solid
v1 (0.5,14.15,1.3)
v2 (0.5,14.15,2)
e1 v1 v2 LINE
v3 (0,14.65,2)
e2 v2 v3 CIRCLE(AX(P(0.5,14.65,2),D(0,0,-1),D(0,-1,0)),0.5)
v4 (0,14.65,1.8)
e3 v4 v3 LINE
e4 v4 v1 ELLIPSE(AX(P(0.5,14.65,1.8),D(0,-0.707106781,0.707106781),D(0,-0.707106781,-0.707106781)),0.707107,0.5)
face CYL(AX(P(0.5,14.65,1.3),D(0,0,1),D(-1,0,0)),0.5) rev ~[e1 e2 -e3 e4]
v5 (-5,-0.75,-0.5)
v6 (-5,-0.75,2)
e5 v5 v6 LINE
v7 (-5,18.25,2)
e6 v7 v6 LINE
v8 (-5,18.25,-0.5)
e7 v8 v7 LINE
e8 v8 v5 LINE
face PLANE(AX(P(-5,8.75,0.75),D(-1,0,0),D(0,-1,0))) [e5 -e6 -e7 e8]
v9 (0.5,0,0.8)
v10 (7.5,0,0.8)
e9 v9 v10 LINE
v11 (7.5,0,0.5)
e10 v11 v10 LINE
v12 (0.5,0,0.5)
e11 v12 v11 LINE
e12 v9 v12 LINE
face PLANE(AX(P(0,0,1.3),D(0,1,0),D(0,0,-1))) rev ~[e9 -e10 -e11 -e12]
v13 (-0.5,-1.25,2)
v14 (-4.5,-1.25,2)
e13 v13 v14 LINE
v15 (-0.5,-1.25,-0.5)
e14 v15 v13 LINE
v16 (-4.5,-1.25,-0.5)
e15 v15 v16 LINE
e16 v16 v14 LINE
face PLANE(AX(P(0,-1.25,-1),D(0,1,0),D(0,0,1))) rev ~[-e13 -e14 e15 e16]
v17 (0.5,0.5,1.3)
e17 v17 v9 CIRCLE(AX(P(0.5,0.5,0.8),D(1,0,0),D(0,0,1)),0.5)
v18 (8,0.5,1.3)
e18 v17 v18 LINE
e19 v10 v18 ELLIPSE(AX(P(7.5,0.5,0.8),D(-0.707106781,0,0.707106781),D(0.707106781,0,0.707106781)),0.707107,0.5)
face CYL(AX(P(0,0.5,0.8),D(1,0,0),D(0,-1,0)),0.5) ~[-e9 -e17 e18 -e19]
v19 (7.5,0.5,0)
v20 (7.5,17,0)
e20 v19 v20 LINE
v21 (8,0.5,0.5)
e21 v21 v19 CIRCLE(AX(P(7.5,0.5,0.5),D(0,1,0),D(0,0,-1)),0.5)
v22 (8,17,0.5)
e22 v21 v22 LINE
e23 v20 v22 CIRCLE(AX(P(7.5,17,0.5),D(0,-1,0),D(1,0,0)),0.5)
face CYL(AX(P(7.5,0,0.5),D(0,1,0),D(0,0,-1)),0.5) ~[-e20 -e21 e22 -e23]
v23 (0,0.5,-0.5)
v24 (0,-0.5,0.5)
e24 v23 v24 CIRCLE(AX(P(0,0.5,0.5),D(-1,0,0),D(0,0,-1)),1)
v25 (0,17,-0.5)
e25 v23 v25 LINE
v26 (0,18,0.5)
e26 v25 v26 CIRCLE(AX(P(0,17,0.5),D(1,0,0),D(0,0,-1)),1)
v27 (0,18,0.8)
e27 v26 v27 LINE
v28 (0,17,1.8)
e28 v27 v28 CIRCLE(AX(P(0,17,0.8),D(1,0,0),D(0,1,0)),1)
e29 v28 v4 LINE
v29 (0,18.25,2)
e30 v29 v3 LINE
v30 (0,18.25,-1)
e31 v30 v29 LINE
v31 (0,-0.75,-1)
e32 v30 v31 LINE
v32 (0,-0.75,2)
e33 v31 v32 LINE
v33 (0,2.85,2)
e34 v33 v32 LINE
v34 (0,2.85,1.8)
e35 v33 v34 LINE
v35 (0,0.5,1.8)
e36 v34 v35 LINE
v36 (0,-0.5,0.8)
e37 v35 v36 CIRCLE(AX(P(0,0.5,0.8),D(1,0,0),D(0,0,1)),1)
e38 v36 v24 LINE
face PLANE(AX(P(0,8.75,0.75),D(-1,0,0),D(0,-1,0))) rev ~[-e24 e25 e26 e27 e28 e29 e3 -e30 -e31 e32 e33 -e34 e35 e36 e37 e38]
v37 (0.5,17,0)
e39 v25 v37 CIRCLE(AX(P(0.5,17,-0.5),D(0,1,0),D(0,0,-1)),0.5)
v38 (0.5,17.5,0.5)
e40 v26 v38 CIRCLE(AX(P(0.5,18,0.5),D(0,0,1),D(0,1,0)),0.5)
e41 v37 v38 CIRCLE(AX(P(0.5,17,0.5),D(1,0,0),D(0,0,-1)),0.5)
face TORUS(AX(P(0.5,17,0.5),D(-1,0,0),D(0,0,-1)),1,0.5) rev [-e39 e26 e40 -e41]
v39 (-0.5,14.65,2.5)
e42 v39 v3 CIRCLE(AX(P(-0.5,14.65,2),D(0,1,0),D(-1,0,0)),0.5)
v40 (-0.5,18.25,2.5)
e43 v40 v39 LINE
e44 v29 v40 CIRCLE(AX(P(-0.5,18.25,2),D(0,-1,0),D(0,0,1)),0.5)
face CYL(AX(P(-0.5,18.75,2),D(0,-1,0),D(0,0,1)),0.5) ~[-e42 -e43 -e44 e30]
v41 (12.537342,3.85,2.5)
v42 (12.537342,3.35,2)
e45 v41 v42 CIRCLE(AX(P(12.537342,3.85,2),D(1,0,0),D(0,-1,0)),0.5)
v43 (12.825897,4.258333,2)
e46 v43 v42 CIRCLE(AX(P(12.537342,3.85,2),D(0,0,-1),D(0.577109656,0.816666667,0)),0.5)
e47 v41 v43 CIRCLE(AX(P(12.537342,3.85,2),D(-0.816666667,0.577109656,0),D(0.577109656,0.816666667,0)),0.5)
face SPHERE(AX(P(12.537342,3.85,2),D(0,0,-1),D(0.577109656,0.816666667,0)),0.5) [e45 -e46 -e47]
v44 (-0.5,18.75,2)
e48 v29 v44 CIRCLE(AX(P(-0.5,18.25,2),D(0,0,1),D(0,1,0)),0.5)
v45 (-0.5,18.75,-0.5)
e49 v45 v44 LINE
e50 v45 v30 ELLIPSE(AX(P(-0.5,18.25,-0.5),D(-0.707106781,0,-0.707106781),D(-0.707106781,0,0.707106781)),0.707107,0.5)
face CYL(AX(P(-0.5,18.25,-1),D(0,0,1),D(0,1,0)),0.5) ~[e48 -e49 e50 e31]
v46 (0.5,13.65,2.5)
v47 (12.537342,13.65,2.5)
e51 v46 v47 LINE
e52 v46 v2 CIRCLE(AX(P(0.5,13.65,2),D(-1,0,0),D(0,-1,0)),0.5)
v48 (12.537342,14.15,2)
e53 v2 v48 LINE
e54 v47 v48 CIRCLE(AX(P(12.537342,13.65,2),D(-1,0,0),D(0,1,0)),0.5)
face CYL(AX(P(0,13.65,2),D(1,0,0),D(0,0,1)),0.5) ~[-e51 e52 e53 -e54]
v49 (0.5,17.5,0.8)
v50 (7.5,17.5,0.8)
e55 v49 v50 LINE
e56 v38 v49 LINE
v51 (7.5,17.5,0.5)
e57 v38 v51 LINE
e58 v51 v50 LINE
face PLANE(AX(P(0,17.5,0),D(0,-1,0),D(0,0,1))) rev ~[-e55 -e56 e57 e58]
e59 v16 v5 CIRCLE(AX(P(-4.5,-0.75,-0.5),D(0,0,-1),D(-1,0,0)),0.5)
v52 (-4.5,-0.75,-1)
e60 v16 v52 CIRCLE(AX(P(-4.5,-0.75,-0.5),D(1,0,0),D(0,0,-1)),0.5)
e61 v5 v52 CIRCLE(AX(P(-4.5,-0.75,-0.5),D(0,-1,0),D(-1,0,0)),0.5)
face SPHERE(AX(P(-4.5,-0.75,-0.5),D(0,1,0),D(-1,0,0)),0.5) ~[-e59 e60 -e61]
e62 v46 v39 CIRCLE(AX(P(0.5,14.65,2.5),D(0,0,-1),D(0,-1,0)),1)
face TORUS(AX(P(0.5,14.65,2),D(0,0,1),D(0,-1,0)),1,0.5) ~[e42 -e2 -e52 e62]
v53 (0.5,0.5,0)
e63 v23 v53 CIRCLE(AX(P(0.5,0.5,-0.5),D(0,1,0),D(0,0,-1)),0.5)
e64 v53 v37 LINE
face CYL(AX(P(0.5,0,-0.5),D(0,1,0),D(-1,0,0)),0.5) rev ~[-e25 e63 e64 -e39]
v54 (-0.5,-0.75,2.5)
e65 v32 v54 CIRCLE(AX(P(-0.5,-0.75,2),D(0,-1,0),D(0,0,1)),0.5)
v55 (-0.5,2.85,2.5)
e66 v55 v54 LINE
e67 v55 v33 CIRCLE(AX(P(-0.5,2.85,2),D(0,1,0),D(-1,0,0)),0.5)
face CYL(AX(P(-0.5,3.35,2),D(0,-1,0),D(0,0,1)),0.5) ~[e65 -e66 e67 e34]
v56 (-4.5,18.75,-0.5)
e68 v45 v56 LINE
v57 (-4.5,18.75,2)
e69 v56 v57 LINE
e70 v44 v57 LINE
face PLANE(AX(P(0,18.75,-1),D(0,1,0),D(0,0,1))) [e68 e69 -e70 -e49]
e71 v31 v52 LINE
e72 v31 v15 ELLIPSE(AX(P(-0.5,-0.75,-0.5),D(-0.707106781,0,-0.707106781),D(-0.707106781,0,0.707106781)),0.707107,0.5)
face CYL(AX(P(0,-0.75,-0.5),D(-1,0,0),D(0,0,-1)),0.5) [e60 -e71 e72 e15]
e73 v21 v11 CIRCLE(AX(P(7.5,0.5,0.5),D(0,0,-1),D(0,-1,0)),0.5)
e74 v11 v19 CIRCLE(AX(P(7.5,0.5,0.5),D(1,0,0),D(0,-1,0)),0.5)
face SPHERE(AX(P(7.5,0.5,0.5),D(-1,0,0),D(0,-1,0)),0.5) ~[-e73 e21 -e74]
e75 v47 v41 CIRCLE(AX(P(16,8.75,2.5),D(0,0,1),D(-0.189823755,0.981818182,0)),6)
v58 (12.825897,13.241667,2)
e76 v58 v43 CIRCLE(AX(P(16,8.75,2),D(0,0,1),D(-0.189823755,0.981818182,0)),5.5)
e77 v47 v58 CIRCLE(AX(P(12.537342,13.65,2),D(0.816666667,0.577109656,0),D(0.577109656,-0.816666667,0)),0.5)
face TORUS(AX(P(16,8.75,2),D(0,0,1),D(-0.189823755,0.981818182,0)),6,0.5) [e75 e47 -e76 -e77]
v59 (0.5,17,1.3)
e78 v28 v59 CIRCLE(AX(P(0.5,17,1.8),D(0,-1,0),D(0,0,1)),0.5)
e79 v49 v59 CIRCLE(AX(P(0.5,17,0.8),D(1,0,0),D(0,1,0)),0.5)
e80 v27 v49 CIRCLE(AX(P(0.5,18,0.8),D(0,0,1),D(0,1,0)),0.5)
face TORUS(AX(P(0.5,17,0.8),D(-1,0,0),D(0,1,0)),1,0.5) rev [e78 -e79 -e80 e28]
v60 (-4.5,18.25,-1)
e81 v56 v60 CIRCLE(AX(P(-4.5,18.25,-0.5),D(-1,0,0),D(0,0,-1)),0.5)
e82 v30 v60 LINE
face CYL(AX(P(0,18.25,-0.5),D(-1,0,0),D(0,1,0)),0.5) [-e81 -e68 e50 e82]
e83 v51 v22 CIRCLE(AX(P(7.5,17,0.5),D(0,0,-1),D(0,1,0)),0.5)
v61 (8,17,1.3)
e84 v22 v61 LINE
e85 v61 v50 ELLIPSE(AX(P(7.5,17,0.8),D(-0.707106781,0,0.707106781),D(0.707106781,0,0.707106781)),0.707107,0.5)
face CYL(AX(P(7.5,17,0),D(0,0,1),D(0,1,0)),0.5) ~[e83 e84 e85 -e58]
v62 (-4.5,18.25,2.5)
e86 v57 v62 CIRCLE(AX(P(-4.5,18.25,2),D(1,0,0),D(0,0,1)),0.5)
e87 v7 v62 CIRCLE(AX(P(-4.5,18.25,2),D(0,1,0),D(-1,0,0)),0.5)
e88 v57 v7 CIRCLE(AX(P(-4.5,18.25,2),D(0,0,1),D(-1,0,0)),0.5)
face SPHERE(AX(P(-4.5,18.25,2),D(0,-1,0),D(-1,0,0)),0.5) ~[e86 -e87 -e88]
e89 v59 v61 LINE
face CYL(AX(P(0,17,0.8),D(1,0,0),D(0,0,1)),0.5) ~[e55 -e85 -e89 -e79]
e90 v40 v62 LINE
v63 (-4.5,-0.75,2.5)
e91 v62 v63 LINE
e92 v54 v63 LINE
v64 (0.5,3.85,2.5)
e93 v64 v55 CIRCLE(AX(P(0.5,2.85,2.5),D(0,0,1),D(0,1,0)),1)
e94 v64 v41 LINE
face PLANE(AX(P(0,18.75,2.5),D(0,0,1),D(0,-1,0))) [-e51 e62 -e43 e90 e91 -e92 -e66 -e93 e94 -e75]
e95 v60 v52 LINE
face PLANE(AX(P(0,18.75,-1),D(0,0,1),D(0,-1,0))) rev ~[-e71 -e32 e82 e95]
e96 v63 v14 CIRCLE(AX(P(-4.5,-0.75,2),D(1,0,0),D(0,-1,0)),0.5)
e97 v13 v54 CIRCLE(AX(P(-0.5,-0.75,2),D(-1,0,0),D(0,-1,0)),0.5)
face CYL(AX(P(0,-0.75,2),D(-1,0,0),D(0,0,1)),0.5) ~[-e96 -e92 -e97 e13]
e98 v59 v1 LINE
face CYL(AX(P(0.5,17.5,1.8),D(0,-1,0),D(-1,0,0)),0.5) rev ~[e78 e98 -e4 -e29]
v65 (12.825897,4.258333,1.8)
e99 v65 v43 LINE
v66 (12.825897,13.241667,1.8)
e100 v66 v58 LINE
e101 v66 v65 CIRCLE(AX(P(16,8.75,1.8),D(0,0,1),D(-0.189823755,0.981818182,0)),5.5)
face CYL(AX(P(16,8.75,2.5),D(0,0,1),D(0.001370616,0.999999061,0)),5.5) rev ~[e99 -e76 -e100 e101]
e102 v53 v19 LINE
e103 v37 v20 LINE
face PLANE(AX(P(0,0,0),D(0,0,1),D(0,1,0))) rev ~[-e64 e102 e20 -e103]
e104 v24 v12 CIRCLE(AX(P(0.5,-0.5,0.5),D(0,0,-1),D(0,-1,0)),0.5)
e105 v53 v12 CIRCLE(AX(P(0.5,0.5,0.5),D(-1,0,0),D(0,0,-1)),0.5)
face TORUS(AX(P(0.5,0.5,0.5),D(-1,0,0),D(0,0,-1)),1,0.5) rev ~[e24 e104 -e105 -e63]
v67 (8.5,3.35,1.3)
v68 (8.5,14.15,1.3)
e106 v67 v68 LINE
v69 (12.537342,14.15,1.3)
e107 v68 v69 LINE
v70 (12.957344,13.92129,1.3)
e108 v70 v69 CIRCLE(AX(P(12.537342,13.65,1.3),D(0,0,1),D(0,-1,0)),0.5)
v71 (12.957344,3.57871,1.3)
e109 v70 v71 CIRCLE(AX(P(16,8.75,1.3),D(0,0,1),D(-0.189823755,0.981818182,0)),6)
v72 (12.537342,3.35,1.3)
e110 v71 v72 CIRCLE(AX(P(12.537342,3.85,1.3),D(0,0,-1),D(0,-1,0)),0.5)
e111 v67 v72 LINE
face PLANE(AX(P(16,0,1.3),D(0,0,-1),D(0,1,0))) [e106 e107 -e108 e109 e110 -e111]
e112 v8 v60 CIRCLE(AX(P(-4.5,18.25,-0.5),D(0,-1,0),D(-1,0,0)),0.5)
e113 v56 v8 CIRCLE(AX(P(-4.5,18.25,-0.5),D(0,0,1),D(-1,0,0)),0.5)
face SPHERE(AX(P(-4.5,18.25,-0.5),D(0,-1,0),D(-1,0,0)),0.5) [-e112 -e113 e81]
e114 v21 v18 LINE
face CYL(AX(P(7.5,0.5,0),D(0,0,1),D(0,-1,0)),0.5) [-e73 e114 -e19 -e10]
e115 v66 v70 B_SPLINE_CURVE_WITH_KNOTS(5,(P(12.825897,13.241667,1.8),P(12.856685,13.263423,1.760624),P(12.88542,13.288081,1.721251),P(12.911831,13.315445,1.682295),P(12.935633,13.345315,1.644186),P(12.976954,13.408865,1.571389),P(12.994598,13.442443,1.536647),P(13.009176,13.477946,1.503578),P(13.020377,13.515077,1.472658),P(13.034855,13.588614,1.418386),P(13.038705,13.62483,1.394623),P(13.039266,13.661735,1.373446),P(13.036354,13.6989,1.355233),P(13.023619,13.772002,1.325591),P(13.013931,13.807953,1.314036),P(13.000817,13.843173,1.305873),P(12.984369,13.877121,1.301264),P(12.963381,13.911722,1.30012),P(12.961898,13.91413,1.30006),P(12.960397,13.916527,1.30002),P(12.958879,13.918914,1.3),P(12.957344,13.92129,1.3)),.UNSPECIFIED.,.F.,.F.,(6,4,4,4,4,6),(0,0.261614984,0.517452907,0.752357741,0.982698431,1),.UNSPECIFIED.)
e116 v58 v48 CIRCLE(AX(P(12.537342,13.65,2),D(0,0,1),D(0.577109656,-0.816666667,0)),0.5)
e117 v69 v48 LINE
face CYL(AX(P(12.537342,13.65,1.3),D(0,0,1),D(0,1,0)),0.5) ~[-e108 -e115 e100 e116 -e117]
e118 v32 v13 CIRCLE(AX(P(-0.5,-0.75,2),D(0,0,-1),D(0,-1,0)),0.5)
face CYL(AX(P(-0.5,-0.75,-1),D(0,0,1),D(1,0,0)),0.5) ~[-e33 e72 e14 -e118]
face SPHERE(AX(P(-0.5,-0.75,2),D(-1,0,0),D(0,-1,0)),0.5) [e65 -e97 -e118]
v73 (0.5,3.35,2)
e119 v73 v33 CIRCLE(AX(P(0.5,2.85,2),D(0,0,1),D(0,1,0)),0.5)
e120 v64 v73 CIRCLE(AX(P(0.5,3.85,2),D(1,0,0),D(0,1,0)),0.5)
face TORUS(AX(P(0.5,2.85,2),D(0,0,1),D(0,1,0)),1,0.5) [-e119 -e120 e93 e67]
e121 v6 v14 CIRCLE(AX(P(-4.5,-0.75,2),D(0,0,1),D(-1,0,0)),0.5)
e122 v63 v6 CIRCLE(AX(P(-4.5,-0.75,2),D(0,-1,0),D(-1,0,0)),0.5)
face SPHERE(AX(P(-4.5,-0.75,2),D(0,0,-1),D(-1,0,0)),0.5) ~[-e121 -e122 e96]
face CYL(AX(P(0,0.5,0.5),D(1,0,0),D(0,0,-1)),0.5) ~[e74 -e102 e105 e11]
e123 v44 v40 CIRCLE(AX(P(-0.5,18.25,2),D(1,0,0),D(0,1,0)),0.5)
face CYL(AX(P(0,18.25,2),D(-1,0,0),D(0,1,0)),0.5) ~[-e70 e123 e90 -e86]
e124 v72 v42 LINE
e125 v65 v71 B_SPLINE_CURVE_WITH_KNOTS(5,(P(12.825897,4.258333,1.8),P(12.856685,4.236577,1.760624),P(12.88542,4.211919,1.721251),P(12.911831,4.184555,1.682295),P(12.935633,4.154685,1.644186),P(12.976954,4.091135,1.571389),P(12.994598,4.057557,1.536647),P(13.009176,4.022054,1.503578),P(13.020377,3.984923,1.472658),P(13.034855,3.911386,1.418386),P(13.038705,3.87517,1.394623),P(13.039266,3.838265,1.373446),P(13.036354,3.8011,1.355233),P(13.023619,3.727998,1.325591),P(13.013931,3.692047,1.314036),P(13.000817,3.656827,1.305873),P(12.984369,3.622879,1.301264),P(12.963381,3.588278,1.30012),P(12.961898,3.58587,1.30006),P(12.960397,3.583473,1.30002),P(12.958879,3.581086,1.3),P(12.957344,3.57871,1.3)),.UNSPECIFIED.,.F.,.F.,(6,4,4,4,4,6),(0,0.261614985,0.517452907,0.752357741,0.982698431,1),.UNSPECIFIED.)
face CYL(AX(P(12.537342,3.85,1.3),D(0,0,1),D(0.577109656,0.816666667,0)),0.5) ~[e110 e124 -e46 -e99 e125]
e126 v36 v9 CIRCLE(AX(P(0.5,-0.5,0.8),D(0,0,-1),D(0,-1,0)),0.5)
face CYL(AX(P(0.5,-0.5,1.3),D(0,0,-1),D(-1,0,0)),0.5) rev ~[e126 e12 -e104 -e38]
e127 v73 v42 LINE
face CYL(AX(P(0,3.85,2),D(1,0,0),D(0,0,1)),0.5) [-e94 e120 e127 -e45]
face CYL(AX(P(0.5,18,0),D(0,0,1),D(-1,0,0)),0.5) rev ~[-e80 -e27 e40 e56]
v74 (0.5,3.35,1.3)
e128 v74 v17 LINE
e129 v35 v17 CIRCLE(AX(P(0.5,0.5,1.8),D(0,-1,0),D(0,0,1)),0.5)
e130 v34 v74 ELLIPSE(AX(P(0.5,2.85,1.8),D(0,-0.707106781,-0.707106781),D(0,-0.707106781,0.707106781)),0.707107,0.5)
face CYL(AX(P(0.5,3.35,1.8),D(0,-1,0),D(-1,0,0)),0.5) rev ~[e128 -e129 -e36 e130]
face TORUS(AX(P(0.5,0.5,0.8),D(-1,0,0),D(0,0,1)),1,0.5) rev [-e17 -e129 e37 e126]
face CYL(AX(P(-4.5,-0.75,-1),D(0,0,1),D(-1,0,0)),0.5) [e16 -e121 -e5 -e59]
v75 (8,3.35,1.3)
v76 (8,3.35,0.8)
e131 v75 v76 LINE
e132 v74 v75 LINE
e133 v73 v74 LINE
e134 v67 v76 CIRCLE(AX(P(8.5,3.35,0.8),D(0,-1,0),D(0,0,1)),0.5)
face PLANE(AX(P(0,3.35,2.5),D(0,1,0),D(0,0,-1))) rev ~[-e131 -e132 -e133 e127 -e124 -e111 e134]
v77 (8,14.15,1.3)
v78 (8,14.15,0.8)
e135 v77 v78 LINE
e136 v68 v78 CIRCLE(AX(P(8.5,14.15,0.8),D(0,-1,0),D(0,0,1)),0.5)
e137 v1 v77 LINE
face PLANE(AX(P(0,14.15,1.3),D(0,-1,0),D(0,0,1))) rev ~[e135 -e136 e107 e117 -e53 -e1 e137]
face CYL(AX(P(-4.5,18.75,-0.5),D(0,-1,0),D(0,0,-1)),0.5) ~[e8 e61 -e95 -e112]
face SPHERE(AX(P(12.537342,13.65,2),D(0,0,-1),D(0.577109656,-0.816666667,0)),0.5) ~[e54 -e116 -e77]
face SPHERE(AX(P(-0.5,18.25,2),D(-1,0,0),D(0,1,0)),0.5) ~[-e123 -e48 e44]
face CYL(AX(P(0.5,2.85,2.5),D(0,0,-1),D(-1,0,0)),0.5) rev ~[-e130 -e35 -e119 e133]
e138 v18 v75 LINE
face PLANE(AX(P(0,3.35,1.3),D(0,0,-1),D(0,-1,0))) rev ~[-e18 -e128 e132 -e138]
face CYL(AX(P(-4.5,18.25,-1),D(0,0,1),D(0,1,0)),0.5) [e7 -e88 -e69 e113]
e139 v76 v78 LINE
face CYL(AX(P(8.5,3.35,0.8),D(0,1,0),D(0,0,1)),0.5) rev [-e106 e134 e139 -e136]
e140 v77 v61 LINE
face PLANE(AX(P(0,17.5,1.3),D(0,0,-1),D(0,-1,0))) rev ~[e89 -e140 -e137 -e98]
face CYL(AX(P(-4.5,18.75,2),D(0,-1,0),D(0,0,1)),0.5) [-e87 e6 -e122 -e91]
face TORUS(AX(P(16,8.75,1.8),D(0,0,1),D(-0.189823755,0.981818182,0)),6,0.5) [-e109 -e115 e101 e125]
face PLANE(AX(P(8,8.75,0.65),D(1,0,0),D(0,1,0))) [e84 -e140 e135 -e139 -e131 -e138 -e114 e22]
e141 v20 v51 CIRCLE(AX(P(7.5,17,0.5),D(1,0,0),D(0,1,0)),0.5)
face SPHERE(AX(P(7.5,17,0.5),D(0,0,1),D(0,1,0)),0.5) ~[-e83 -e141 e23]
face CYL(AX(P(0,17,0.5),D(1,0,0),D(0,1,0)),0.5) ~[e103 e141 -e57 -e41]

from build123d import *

# Parameters (mm, degrees)
F1_DEPTH = 16
F2_W     = 20
F2_H     = 3.5
F3_DEPTH = 5
F5_DEPTH = 5
F6_W     = 17.5
F6_H     = 1.3
F7_DEPTH = 8
F8_R     = 0.5


# Not quite as in the source:
# - ends of sketch curves that miss each other by under 0.0002 mm in the source are joined


with BuildPart() as f1:
    # F0 (on Right) → F1 (new body)
    with BuildSketch(Plane.YZ):
        Polygon((14.15, 1.3), (14.15, 2.5), (3.35, 2.5), (3.35, 1.3), (0, 1.3), (0, 0), (17.5, 0), (17.5, 1.3), align=None)
    extrude(amount=F1_DEPTH)

    # F2 (on face) → F3 (join)
    with BuildSketch(Plane(origin=(0, 0, 0), x_dir=(0, -1, 0), z_dir=(-1, 0, 0))):
        with Locations((-8.75, 0.75)):
            Rectangle(F2_W, F2_H)
    extrude(amount=F3_DEPTH)

    # F4 (on face) → F5 (cut)
    with BuildSketch(Plane.XY.offset(2.5)):
        with BuildLine():
            ThreePointArc((16.0075383861, 14.2499948339), (10.5000136527, 8.7377452223), (16.0320477827, 3.2500933699))
            Line((16.0320477827, 3.2500933699), (16.0075383861, 14.2499948339))
        make_face()
    extrude(amount=-F5_DEPTH, mode=Mode.SUBTRACT)

    # F6 (on face) → F7 (cut)
    with BuildSketch(Plane.YZ.offset(16)):
        with Locations((8.75, 0.65)):
            Rectangle(F6_W, F6_H)
    extrude(amount=-F7_DEPTH, mode=Mode.SUBTRACT)

    # F8
    f8_edges = [f1.edges().sort_by_distance(p)[0] for p in [
        (7.477985, 3.35, 2.5),
        (14.955969, 3.35, 1.9),
        (14.955969, 14.15, 1.9),
        (10.5, 8.75, 2.5),
        (10.5, 8.75, 1.3),
        (7.477985, 14.15, 2.5),
        (8, 8.75, 1.3),
        (0, 8.75, 0),
        (0, 1.675, 1.3),
        (0, 0, 0.65),
        (0, 17.5, 0.65),
        (0, 15.825, 1.3),
        (-5, 8.75, -1),
        (-5, -1.25, 0.75),
        (-5, 8.75, 2.5),
        (-5, 18.75, 0.75),
        (-2.5, -1.25, -1),
        (-2.5, -1.25, 2.5),
        (0, -1.25, 0.75),
        (-2.5, 18.75, 2.5),
        (-2.5, 18.75, -1),
        (0, 18.75, 0.75),
        (4, 17.5, 1.3),
        (8, 17.5, 0.65),
        (4, 17.5, 0),
        (4, 0, 0),
        (8, 0, 0.65),
        (4, 0, 1.3),
        (8, 8.75, 0),
        (0, 1.05, 2.5),
        (0, 16.45, 2.5),
        (0, 3.35, 1.9),
        (0, 14.15, 1.9),
    ]]
    fillet(f8_edges, radius=F8_R)


solid = f1.part
